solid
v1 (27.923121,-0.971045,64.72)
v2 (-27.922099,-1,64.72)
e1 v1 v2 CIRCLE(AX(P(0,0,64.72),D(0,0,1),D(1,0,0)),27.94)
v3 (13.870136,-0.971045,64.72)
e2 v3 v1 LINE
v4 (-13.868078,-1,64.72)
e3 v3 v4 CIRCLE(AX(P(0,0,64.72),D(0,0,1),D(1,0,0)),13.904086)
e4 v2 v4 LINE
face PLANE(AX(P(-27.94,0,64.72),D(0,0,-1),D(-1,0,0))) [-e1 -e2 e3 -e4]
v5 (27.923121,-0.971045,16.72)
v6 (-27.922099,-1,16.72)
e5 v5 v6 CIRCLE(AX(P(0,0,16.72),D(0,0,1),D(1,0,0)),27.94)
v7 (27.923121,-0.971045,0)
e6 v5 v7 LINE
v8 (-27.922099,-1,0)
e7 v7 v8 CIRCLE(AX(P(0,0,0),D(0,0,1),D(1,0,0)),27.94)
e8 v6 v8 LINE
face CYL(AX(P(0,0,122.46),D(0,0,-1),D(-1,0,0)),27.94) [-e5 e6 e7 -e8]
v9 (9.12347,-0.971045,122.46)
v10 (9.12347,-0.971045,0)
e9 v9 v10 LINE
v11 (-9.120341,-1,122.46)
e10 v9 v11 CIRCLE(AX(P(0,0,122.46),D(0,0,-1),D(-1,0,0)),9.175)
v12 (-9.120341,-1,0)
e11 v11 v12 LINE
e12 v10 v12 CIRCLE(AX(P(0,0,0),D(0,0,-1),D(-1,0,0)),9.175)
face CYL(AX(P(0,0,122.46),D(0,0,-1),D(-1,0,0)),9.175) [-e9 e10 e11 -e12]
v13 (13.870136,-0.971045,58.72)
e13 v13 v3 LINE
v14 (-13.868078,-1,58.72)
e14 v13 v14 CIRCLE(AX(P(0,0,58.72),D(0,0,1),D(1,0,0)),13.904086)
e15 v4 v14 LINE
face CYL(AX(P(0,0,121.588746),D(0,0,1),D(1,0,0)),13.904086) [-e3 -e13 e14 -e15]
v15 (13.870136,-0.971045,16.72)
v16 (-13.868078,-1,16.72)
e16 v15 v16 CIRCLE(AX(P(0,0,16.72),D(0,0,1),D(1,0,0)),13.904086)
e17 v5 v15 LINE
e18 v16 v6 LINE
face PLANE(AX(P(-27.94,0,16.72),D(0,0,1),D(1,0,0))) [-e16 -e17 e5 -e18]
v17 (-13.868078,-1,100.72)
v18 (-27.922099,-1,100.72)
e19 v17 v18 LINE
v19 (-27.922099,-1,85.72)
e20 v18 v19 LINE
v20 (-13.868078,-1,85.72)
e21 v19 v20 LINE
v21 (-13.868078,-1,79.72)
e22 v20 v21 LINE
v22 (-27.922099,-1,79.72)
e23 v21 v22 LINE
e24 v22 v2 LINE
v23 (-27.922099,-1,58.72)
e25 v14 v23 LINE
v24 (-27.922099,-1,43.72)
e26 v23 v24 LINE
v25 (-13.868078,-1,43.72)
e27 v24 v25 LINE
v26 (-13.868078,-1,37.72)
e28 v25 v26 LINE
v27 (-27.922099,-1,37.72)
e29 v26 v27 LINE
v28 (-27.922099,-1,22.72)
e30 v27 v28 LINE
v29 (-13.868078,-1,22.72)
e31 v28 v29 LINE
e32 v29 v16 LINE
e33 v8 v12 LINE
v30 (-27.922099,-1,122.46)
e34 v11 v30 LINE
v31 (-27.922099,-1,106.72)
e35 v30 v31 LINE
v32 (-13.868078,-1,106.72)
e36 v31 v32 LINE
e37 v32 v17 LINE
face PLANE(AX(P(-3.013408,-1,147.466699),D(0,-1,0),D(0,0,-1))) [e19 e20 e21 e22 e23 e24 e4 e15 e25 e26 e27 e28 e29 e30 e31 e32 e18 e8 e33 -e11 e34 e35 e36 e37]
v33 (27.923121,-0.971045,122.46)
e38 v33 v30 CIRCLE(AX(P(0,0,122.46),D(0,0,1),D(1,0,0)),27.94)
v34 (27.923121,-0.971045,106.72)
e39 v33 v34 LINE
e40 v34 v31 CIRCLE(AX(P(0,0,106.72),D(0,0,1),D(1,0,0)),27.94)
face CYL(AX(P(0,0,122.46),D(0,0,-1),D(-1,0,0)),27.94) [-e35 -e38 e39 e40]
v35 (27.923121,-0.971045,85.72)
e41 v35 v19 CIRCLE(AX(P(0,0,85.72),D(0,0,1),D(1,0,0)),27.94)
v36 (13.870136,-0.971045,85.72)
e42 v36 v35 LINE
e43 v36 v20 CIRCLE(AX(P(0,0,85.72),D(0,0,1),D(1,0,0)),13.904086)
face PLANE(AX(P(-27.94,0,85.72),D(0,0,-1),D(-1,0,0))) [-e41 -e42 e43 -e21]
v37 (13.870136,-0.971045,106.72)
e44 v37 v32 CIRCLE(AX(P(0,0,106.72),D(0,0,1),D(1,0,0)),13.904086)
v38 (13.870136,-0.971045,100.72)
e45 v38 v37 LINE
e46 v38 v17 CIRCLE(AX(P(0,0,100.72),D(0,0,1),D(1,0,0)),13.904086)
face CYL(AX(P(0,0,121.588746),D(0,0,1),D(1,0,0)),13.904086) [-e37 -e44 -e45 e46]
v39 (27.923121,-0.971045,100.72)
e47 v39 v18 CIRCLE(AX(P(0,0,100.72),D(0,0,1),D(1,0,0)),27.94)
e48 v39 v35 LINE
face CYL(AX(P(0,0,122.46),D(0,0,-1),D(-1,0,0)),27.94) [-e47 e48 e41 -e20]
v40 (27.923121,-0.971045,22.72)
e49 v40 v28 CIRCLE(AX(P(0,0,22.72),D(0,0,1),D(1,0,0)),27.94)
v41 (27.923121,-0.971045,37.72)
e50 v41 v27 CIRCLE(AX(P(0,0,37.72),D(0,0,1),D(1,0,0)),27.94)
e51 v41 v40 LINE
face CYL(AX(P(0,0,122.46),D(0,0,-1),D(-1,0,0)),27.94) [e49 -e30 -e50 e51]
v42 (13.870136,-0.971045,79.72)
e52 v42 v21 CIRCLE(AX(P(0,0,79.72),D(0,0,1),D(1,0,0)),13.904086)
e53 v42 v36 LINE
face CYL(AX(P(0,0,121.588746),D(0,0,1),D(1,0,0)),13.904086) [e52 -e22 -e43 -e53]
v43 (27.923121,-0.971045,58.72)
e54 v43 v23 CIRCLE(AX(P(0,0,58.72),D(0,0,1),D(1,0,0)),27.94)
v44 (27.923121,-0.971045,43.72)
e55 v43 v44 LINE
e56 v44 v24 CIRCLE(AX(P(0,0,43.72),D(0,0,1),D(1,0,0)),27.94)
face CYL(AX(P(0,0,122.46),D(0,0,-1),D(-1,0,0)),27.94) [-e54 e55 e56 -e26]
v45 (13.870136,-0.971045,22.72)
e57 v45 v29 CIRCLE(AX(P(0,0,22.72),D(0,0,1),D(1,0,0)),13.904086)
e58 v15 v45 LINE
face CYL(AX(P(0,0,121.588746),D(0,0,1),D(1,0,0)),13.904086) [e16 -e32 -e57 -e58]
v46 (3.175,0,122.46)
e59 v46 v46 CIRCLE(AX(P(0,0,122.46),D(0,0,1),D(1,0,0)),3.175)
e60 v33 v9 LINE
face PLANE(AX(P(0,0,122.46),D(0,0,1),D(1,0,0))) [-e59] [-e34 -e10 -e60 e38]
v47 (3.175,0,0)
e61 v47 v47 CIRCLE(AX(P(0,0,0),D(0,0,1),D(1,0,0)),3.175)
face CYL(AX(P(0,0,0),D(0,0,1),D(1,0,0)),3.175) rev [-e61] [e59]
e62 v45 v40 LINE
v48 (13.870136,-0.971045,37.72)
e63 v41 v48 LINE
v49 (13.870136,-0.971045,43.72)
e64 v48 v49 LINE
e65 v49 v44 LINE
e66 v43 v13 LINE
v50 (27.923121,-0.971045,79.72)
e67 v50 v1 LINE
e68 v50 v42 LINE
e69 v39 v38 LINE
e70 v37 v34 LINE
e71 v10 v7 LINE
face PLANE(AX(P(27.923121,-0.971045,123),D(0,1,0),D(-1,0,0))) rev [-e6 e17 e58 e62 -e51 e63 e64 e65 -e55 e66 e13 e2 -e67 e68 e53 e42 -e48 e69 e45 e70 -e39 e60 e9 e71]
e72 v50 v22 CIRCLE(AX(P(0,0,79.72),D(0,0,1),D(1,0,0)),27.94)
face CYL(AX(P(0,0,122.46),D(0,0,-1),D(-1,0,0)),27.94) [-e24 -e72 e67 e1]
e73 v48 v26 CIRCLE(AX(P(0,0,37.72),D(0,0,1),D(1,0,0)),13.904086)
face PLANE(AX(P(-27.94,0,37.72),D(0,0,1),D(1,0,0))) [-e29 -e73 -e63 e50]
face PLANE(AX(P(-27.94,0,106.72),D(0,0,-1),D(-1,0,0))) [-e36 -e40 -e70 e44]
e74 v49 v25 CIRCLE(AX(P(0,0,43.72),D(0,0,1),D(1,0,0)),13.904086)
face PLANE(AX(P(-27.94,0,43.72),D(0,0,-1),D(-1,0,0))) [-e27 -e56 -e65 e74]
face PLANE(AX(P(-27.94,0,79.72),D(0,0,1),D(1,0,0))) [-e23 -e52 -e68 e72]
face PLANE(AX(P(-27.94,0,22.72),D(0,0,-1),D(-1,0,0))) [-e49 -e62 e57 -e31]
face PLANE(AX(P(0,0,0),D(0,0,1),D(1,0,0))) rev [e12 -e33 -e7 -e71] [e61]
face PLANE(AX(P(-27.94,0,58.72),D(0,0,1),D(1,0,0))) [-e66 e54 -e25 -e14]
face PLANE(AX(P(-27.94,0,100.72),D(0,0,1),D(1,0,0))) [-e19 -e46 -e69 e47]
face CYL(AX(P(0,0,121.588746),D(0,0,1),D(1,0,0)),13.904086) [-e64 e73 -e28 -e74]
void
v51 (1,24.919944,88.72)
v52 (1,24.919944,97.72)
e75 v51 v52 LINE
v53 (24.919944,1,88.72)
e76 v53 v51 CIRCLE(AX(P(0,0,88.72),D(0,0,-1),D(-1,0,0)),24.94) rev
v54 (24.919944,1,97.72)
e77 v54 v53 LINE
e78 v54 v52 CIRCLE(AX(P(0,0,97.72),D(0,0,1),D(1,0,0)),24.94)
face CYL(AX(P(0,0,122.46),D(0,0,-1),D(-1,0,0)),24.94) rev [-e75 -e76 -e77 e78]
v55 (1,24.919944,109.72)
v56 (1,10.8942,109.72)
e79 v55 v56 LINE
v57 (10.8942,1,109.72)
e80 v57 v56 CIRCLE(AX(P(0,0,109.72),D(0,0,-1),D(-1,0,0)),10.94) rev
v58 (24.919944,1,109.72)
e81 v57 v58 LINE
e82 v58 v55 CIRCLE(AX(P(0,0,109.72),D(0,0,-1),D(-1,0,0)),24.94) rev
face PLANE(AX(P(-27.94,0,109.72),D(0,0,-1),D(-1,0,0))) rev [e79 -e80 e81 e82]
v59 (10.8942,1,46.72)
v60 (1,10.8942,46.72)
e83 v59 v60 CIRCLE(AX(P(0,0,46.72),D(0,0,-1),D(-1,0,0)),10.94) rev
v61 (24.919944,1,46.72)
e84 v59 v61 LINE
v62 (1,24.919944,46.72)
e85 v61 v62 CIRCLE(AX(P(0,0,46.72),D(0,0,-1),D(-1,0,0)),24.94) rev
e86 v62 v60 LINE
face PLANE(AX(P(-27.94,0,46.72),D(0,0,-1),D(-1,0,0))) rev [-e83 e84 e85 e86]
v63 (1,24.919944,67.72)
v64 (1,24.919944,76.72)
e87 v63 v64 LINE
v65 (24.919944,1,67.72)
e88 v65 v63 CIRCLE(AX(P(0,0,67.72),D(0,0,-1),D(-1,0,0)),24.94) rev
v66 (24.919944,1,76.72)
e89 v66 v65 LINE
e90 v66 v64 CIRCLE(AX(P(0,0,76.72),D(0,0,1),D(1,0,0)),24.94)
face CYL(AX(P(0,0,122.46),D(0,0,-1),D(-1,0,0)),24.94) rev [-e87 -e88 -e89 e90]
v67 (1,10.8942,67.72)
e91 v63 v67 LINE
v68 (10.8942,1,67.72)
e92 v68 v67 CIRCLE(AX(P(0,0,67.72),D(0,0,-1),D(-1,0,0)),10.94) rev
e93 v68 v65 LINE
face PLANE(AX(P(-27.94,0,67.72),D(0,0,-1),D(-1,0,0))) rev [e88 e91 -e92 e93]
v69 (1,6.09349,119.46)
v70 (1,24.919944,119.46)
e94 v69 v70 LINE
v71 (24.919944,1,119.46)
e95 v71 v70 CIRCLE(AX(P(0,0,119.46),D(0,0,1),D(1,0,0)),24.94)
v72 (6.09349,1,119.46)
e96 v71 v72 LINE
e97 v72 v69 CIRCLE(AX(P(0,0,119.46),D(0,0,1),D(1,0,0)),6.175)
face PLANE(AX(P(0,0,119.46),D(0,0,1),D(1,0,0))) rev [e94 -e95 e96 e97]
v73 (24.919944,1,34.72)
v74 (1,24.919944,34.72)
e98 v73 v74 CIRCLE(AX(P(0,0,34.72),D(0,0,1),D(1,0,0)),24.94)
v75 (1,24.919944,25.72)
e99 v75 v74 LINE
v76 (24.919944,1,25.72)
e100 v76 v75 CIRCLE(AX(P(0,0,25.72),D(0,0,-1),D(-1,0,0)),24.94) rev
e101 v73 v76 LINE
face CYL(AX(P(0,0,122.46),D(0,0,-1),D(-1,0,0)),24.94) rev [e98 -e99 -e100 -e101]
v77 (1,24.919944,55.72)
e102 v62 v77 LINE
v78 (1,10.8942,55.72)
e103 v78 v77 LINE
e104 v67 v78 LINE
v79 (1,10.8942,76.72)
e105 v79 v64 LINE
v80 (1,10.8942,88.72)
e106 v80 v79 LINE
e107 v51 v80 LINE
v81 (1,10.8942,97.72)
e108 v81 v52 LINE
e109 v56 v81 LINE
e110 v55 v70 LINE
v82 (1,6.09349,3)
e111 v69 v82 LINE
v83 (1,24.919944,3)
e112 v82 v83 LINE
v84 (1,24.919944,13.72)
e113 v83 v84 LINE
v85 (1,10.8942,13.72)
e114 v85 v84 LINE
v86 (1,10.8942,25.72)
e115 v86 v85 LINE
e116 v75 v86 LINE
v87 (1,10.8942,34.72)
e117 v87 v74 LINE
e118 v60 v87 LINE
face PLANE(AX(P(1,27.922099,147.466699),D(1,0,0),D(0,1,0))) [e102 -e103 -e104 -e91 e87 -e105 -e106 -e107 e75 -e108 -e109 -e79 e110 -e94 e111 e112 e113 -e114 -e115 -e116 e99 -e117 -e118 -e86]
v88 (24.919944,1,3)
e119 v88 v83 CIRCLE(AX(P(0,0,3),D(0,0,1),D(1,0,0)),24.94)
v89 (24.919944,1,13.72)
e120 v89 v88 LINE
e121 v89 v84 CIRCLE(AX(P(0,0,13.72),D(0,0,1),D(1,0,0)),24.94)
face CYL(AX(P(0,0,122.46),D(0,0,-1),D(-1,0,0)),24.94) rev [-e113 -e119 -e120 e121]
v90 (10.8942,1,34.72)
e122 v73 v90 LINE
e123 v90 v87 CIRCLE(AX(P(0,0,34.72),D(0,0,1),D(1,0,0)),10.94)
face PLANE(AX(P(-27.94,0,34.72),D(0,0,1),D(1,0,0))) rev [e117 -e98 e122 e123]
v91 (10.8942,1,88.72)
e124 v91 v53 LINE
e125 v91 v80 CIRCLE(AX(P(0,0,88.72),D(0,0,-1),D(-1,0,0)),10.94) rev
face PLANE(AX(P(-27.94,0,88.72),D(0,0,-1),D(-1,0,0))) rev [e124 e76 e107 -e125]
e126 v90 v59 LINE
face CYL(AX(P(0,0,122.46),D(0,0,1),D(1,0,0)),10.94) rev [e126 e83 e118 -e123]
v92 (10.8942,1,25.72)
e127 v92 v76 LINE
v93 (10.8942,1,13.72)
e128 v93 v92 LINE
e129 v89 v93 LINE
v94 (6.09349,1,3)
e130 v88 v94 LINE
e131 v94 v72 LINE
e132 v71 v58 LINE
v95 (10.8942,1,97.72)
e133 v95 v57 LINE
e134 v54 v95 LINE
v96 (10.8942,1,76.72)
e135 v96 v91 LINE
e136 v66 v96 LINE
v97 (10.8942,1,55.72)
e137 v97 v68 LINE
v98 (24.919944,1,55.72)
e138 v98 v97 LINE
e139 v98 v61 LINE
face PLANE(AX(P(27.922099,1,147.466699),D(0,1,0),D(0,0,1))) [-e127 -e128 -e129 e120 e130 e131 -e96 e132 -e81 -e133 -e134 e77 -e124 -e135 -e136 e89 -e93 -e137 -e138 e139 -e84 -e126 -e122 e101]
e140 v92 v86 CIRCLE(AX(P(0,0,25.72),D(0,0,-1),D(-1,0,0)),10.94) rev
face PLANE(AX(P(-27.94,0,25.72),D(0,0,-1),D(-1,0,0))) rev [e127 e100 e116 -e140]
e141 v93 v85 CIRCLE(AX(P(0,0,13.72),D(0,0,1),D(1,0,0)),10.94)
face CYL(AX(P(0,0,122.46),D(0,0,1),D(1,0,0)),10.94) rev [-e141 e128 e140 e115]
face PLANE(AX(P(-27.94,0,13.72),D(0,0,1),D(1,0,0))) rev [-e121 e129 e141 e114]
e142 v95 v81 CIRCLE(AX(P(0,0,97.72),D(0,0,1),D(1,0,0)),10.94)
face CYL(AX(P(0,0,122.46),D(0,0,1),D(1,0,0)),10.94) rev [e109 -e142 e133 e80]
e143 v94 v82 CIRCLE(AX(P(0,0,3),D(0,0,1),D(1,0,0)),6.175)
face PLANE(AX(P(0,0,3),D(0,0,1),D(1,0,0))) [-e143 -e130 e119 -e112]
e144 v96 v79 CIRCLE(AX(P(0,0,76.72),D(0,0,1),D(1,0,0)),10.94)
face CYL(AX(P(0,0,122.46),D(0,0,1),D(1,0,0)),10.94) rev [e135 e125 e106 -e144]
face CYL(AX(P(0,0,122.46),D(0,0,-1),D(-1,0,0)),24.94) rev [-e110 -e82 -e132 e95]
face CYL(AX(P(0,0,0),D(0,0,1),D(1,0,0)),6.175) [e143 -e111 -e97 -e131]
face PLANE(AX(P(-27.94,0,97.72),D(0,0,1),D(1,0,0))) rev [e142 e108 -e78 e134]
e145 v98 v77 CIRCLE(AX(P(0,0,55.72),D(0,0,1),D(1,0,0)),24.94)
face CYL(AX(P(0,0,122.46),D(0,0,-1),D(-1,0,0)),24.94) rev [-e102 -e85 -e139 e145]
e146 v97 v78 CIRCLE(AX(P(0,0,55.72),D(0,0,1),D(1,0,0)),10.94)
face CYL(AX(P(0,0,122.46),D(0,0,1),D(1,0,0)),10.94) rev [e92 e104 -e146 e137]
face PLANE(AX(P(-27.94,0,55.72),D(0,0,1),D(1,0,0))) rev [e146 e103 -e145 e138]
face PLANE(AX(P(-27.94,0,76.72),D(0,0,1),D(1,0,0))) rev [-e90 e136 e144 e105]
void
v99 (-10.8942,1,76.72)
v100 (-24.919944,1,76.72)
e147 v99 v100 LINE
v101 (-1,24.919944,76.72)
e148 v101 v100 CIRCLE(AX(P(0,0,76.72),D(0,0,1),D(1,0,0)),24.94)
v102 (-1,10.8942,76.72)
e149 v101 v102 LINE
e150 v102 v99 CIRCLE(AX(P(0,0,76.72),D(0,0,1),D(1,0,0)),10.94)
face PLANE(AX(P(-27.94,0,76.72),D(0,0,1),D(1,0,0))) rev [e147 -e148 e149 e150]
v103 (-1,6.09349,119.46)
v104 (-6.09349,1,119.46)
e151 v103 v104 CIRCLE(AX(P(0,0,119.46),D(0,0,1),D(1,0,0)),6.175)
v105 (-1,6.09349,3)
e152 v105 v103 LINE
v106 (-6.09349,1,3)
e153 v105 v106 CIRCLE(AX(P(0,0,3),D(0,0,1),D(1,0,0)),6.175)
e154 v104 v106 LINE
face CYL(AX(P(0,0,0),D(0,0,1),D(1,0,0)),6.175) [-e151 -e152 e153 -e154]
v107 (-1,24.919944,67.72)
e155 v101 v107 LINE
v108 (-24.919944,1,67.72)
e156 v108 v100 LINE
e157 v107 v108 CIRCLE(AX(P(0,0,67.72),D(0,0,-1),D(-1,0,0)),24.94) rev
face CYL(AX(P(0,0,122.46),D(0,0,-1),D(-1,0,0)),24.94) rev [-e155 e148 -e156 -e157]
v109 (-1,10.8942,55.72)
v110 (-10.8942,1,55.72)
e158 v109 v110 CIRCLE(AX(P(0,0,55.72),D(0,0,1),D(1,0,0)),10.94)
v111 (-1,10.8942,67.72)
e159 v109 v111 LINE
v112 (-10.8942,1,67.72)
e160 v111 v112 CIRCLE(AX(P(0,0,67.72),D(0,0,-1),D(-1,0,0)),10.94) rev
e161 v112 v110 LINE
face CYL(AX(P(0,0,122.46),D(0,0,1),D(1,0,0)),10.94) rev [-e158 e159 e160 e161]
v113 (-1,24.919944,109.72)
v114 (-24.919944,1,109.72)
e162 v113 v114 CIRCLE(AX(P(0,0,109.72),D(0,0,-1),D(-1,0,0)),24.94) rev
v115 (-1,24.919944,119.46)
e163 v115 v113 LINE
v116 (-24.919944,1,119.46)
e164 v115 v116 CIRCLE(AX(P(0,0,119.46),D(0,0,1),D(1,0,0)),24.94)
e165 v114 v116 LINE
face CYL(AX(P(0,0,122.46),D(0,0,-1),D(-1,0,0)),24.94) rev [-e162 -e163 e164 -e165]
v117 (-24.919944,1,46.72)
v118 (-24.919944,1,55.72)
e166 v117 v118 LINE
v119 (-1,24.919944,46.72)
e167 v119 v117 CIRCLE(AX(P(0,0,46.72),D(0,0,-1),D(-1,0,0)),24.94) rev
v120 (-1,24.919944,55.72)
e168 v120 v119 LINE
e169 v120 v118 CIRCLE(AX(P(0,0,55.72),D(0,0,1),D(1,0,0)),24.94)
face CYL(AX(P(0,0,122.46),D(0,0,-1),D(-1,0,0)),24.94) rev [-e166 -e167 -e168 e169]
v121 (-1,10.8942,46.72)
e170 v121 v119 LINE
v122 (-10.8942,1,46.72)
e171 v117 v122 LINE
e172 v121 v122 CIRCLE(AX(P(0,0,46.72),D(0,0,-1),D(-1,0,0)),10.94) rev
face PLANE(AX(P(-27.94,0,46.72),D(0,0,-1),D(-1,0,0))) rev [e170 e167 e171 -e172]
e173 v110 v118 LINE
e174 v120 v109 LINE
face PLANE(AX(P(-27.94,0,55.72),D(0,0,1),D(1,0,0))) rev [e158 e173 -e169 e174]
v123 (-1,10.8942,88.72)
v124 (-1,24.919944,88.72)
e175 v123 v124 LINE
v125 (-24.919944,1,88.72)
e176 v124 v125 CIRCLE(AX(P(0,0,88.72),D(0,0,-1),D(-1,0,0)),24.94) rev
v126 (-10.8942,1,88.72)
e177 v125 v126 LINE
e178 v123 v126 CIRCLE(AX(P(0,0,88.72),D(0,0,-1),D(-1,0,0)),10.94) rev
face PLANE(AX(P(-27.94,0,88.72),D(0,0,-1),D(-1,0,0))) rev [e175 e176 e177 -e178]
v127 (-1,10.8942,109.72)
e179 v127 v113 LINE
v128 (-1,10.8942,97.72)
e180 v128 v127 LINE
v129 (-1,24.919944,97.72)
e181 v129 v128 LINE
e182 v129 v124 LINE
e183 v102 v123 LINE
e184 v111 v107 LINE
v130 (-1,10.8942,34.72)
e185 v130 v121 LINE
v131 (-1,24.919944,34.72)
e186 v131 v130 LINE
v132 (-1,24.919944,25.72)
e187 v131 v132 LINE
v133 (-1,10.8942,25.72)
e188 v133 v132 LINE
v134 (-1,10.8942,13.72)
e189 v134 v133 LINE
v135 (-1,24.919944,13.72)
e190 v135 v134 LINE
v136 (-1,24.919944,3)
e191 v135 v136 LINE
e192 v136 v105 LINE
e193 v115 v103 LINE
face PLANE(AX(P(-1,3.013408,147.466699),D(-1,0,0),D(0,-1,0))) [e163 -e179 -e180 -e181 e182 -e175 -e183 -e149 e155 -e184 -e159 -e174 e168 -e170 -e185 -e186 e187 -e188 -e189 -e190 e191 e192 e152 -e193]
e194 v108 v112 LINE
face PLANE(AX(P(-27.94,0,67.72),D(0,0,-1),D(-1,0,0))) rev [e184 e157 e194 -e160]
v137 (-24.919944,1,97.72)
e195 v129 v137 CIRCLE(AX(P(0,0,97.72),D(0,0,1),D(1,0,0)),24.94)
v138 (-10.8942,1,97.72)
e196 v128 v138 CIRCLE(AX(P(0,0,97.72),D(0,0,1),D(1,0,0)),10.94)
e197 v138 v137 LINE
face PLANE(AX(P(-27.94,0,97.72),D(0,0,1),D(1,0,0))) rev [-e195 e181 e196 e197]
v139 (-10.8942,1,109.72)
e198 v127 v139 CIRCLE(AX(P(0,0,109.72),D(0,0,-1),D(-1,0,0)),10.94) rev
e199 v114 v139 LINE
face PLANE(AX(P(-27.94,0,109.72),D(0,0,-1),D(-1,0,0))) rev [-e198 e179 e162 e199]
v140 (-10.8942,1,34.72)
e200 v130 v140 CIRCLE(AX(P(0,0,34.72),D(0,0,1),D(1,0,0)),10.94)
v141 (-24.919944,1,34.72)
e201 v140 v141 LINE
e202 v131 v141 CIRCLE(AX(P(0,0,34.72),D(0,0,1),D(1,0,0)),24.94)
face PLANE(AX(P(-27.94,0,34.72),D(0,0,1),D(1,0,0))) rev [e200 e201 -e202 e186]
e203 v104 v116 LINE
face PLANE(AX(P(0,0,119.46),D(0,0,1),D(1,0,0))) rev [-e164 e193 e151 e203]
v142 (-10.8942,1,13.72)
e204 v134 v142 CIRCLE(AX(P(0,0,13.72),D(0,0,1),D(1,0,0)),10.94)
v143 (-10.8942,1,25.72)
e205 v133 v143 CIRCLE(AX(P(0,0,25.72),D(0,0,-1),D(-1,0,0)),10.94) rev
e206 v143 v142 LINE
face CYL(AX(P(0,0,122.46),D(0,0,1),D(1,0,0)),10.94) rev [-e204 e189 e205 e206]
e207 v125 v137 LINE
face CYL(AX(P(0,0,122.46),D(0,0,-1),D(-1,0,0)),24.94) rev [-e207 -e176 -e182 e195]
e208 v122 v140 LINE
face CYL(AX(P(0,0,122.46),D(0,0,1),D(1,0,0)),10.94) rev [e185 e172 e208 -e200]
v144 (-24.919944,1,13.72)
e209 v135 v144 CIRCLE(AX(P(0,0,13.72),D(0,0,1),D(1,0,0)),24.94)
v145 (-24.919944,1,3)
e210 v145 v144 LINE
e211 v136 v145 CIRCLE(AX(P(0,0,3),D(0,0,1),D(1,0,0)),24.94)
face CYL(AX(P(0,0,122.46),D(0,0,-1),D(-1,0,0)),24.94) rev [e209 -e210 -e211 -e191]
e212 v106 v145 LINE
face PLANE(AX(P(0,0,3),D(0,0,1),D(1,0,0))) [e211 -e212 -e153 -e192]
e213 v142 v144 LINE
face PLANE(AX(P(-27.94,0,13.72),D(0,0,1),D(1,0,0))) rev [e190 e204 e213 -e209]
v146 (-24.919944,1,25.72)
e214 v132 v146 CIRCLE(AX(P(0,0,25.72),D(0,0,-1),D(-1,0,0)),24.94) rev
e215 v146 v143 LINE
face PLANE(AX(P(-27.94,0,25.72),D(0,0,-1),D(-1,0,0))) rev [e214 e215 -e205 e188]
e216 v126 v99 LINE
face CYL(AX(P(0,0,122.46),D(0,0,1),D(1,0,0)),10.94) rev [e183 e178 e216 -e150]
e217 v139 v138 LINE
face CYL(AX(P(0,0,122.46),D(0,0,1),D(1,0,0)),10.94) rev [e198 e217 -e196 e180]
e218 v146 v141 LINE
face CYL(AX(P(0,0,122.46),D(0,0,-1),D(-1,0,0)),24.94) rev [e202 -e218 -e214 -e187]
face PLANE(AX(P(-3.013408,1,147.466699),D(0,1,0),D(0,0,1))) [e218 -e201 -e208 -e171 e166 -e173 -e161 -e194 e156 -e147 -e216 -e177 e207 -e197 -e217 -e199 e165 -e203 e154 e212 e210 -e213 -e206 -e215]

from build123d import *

# Parameters (mm, degrees)
SKETCH3_R            = 27.94
BOSS_EXTRUDE2_DEPTH  = 122.46
SKETCH5_R            = 3.175
CUT_EXTRUDE1_DEPTH   = 129.676877488
SKETCH4_W            = 14
SKETCH4_H            = 6
SHELL1_START         = 3
SHELL1_OUTLINE_R     = 10.94
SHELL1_OUTLINE_R_2   = 6.175
SHELL1_DEPTH         = 116.46
SHELL1_2_OUTLINE_R   = 24.94
SHELL1_2_OUTLINE_R_2 = 10.94
SHELL1_2_DEPTH       = 10.72
SHELL1_START_2       = 109.72
SHELL1_3_OUTLINE_R   = 24.94
SHELL1_3_OUTLINE_R_2 = 10.94
SHELL1_3_DEPTH       = 9.74
SHELL1_START_3       = 25.72
SHELL1_4_OUTLINE_R   = 24.94
SHELL1_4_OUTLINE_R_2 = 10.94
SHELL1_4_DEPTH       = 9
SHELL1_START_4       = 46.72
SHELL1_5_OUTLINE_R   = 24.94
SHELL1_5_OUTLINE_R_2 = 10.94
SHELL1_5_DEPTH       = 9
SHELL1_START_5       = 67.72
SHELL1_6_OUTLINE_R   = 24.94
SHELL1_6_OUTLINE_R_2 = 10.94
SHELL1_6_DEPTH       = 9
SHELL1_START_6       = 88.72
SHELL1_7_OUTLINE_R   = 24.94
SHELL1_7_OUTLINE_R_2 = 10.94
SHELL1_7_DEPTH       = 9
BOSS_EXTRUDE3_REACH  = 130.677
SKETCH13_W           = 16.483162312
SKETCH13_H           = 6
CUT_EXTRUDE3_DEPTH   = 123
BOSS_EXTRUDE5_START  = -122.46
BOSS_EXTRUDE5_DEPTH  = 122.46


# Read off the part's stored shape, not the designer's step: Shell1
with BuildPart() as part:
    # Sketch3 → Boss-Extrude2 (new body)
    with BuildSketch(Plane.XY):
        Circle(SKETCH3_R)
    extrude(amount=BOSS_EXTRUDE2_DEPTH)

    # Sketch5 → Cut-Extrude1 (cut, through all)
    with BuildSketch(Plane.XY.offset(122.46)):
        Circle(SKETCH5_R)
    extrude(amount=-CUT_EXTRUDE1_DEPTH, mode=Mode.SUBTRACT)

    # Sketch4 → Cut-Revolve1 (revolve, cut)
    with BuildSketch(Plane(origin=(0, 0, 0), x_dir=(1, 0, 0), z_dir=(0, 1, 0)), mode=Mode.PRIVATE) as cut_revolve1_sk:
        with Locations((-20.94, -103.72)):
            Rectangle(SKETCH4_W, SKETCH4_H)
        with Locations((-20.94, -82.72)):
            Rectangle(SKETCH4_W, SKETCH4_H)
        with Locations((-20.94, -61.72)):
            Rectangle(SKETCH4_W, SKETCH4_H)
        with Locations((-20.94, -40.72)):
            Rectangle(SKETCH4_W, SKETCH4_H)
        with Locations((-20.94, -19.72)):
            Rectangle(SKETCH4_W, SKETCH4_H)
    revolve(cut_revolve1_sk.sketch.rotate(Axis((0, 0, 122.46), (0, 0, -1)), 180), axis=Axis((0, 0, 122.46), (0, 0, -1)), mode=Mode.SUBTRACT)

    # Shell1 outline → Shell1 (cut)
    with BuildSketch(Plane.XY.offset(SHELL1_START)):
        Circle(SHELL1_OUTLINE_R)
        Circle(SHELL1_OUTLINE_R_2, mode=Mode.SUBTRACT)
    extrude(amount=SHELL1_DEPTH, mode=Mode.SUBTRACT)

    # Shell1 2 outline → Shell1 2 (cut)
    with BuildSketch(Plane.XY.offset(SHELL1_START)):
        Circle(SHELL1_2_OUTLINE_R)
        Circle(SHELL1_2_OUTLINE_R_2, mode=Mode.SUBTRACT)
    extrude(amount=SHELL1_2_DEPTH, mode=Mode.SUBTRACT)

    # Shell1 3 outline → Shell1 3 (cut)
    with BuildSketch(Plane.XY.offset(SHELL1_START_2)):
        Circle(SHELL1_3_OUTLINE_R)
        Circle(SHELL1_3_OUTLINE_R_2, mode=Mode.SUBTRACT)
    extrude(amount=SHELL1_3_DEPTH, mode=Mode.SUBTRACT)

    # Shell1 4 outline → Shell1 4 (cut)
    with BuildSketch(Plane.XY.offset(SHELL1_START_3)):
        Circle(SHELL1_4_OUTLINE_R)
        Circle(SHELL1_4_OUTLINE_R_2, mode=Mode.SUBTRACT)
    extrude(amount=SHELL1_4_DEPTH, mode=Mode.SUBTRACT)

    # Shell1 5 outline → Shell1 5 (cut)
    with BuildSketch(Plane.XY.offset(SHELL1_START_4)):
        Circle(SHELL1_5_OUTLINE_R)
        Circle(SHELL1_5_OUTLINE_R_2, mode=Mode.SUBTRACT)
    extrude(amount=SHELL1_5_DEPTH, mode=Mode.SUBTRACT)

    # Shell1 6 outline → Shell1 6 (cut)
    with BuildSketch(Plane.XY.offset(SHELL1_START_5)):
        Circle(SHELL1_6_OUTLINE_R)
        Circle(SHELL1_6_OUTLINE_R_2, mode=Mode.SUBTRACT)
    extrude(amount=SHELL1_6_DEPTH, mode=Mode.SUBTRACT)

    # Shell1 7 outline → Shell1 7 (cut)
    with BuildSketch(Plane.XY.offset(SHELL1_START_6)):
        Circle(SHELL1_7_OUTLINE_R)
        Circle(SHELL1_7_OUTLINE_R_2, mode=Mode.SUBTRACT)
    extrude(amount=SHELL1_7_DEPTH, mode=Mode.SUBTRACT)

    # Boss-Extrude3: up to this face of the body (flat: up to its plane)
    boss_extrude3_end = Plane(part.part.faces().sort_by_distance((-27.149737461, 0, 122.46))[0])
    # Sketch10 → Boss-Extrude3 (add, up to the picked face)
    with BuildSketch(Plane(origin=(0, 0, 0), x_dir=(-1, 0, 0), z_dir=(0, 0, -1)), mode=Mode.PRIVATE) as boss_extrude3_sk1:
        with BuildLine():
            Line((-1, 27.922098775), (-1, 3.01340754))
            ThreePointArc((-1, 3.01340754), (0, 3.175), (1, 3.01340754))
            Line((1, 3.01340754), (1, 27.922098775))
            ThreePointArc((1, 27.922098775), (0, 27.94), (-1, 27.922098775))
        make_face()
    boss_extrude3_tool1 = split(extrude(boss_extrude3_sk1.sketch, amount=-BOSS_EXTRUDE3_REACH, mode=Mode.PRIVATE), bisect_by=boss_extrude3_end, keep=Keep.BOTH, mode=Mode.PRIVATE)
    # Sketch10 → Boss-Extrude3 (add, up to the picked face)
    with BuildSketch(Plane(origin=(0, 0, 0), x_dir=(-1, 0, 0), z_dir=(0, 0, -1)), mode=Mode.PRIVATE) as boss_extrude3_sk2:
        with BuildLine():
            Line((3.01340754, 1), (27.922098775, 1))
            ThreePointArc((27.922098775, 1), (27.94, 0), (27.922098775, -1))
            Line((27.922098775, -1), (3.01340754, -1))
            ThreePointArc((3.01340754, -1), (3.175, 0), (3.01340754, 1))
        make_face()
    boss_extrude3_tool2 = split(extrude(boss_extrude3_sk2.sketch, amount=-BOSS_EXTRUDE3_REACH, mode=Mode.PRIVATE), bisect_by=boss_extrude3_end, keep=Keep.BOTH, mode=Mode.PRIVATE)
    # Sketch10 → Boss-Extrude3 (add, up to the picked face)
    with BuildSketch(Plane(origin=(0, 0, 0), x_dir=(-1, 0, 0), z_dir=(0, 0, -1)), mode=Mode.PRIVATE) as boss_extrude3_sk3:
        with BuildLine():
            Line((-1, -3.01340754), (-1, -27.922098775))
            ThreePointArc((-1, -27.922098775), (0, -27.94), (1, -27.922098775))
            Line((1, -27.922098775), (1, -3.01340754))
            ThreePointArc((1, -3.01340754), (0, -3.175), (-1, -3.01340754))
        make_face()
    boss_extrude3_tool3 = split(extrude(boss_extrude3_sk3.sketch, amount=-BOSS_EXTRUDE3_REACH, mode=Mode.PRIVATE), bisect_by=boss_extrude3_end, keep=Keep.BOTH, mode=Mode.PRIVATE)
    # Sketch10 → Boss-Extrude3 (add, up to the picked face)
    with BuildSketch(Plane(origin=(0, 0, 0), x_dir=(-1, 0, 0), z_dir=(0, 0, -1)), mode=Mode.PRIVATE) as boss_extrude3_sk4:
        with BuildLine():
            Line((-27.922098775, -1), (-3.01340754, -1))
            ThreePointArc((-3.01340754, -1), (-3.175, 0), (-3.01340754, 1))
            Line((-3.01340754, 1), (-27.922098775, 1))
            ThreePointArc((-27.922098775, 1), (-27.94, 0), (-27.922098775, -1))
        make_face()
    boss_extrude3_tool4 = split(extrude(boss_extrude3_sk4.sketch, amount=-BOSS_EXTRUDE3_REACH, mode=Mode.PRIVATE), bisect_by=boss_extrude3_end, keep=Keep.BOTH, mode=Mode.PRIVATE)
    add(boss_extrude3_tool1.solids().sort_by(Axis((0, 15.527819, 0), (0, 0, 1)))[0])
    add(boss_extrude3_tool2.solids().sort_by(Axis((-15.527819, 0, 0), (0, 0, 1)))[0])
    add(boss_extrude3_tool3.solids().sort_by(Axis((0, -15.527819, 0), (0, 0, 1)))[0])
    add(boss_extrude3_tool4.solids().sort_by(Axis((15.527819, 0, 0), (0, 0, 1)))[0])

    # Sketch13 → Cut-Revolve2 (revolve, cut)
    with BuildSketch(Plane(origin=(0, 0, 0), x_dir=(1, 0, 0), z_dir=(0, 1, 0)), mode=Mode.PRIVATE) as cut_revolve2_sk:
        with Locations((-22.145666886, -40.72)):
            Rectangle(SKETCH13_W, SKETCH13_H)
        with Locations((-22.145666886, -19.72)):
            Rectangle(SKETCH13_W, SKETCH13_H)
        with Locations((-22.145666886, -61.72)):
            Rectangle(SKETCH13_W, SKETCH13_H)
        with Locations((-22.145666886, -82.72)):
            Rectangle(SKETCH13_W, SKETCH13_H)
        with Locations((-22.145666886, -103.72)):
            Rectangle(SKETCH13_W, SKETCH13_H)
    revolve(cut_revolve2_sk.sketch.rotate(Axis((0, 0, 121.588746248), (0, 0, -1)), 180), axis=Axis((0, 0, 121.588746248), (0, 0, -1)), mode=Mode.SUBTRACT)

    # Sketch16 → Cut-Extrude3 (cut)
    with BuildSketch(Plane(origin=(0, 0, 0), x_dir=(-1, 0, 0), z_dir=(0, 0, -1))):
        with BuildLine():
            Line((-27.923120749, -0.971044624), (-6.098171639, -0.971044624))
            ThreePointArc((-6.098171639, -0.971044624), (-0.014665674, -6.174982584), (6.093490379, -1))
            Line((6.093490379, -1), (27.922098775, -1))
            ThreePointArc((27.922098775, -1), (-0.014486703, -27.939996244), (-27.923120749, -0.971044624))
        make_face()
    extrude(amount=-CUT_EXTRUDE3_DEPTH, mode=Mode.SUBTRACT)

    # Sketch18 → Boss-Extrude5 (add)
    with BuildSketch(Plane(origin=(0, 0, 0), x_dir=(-1, 0, 0), z_dir=(0, 0, -1)).offset(BOSS_EXTRUDE5_START)):
        with BuildLine():
            Line((-3.175, 0), (-9.175, 0))
            ThreePointArc((-9.175, 0), (0, -9.175), (9.175, 0))
            Line((9.175, 0), (3.175, 0))
            ThreePointArc((3.175, 0), (0, -3.175), (-3.175, 0))
        make_face()
    extrude(amount=BOSS_EXTRUDE5_DEPTH)


solid = part.part
